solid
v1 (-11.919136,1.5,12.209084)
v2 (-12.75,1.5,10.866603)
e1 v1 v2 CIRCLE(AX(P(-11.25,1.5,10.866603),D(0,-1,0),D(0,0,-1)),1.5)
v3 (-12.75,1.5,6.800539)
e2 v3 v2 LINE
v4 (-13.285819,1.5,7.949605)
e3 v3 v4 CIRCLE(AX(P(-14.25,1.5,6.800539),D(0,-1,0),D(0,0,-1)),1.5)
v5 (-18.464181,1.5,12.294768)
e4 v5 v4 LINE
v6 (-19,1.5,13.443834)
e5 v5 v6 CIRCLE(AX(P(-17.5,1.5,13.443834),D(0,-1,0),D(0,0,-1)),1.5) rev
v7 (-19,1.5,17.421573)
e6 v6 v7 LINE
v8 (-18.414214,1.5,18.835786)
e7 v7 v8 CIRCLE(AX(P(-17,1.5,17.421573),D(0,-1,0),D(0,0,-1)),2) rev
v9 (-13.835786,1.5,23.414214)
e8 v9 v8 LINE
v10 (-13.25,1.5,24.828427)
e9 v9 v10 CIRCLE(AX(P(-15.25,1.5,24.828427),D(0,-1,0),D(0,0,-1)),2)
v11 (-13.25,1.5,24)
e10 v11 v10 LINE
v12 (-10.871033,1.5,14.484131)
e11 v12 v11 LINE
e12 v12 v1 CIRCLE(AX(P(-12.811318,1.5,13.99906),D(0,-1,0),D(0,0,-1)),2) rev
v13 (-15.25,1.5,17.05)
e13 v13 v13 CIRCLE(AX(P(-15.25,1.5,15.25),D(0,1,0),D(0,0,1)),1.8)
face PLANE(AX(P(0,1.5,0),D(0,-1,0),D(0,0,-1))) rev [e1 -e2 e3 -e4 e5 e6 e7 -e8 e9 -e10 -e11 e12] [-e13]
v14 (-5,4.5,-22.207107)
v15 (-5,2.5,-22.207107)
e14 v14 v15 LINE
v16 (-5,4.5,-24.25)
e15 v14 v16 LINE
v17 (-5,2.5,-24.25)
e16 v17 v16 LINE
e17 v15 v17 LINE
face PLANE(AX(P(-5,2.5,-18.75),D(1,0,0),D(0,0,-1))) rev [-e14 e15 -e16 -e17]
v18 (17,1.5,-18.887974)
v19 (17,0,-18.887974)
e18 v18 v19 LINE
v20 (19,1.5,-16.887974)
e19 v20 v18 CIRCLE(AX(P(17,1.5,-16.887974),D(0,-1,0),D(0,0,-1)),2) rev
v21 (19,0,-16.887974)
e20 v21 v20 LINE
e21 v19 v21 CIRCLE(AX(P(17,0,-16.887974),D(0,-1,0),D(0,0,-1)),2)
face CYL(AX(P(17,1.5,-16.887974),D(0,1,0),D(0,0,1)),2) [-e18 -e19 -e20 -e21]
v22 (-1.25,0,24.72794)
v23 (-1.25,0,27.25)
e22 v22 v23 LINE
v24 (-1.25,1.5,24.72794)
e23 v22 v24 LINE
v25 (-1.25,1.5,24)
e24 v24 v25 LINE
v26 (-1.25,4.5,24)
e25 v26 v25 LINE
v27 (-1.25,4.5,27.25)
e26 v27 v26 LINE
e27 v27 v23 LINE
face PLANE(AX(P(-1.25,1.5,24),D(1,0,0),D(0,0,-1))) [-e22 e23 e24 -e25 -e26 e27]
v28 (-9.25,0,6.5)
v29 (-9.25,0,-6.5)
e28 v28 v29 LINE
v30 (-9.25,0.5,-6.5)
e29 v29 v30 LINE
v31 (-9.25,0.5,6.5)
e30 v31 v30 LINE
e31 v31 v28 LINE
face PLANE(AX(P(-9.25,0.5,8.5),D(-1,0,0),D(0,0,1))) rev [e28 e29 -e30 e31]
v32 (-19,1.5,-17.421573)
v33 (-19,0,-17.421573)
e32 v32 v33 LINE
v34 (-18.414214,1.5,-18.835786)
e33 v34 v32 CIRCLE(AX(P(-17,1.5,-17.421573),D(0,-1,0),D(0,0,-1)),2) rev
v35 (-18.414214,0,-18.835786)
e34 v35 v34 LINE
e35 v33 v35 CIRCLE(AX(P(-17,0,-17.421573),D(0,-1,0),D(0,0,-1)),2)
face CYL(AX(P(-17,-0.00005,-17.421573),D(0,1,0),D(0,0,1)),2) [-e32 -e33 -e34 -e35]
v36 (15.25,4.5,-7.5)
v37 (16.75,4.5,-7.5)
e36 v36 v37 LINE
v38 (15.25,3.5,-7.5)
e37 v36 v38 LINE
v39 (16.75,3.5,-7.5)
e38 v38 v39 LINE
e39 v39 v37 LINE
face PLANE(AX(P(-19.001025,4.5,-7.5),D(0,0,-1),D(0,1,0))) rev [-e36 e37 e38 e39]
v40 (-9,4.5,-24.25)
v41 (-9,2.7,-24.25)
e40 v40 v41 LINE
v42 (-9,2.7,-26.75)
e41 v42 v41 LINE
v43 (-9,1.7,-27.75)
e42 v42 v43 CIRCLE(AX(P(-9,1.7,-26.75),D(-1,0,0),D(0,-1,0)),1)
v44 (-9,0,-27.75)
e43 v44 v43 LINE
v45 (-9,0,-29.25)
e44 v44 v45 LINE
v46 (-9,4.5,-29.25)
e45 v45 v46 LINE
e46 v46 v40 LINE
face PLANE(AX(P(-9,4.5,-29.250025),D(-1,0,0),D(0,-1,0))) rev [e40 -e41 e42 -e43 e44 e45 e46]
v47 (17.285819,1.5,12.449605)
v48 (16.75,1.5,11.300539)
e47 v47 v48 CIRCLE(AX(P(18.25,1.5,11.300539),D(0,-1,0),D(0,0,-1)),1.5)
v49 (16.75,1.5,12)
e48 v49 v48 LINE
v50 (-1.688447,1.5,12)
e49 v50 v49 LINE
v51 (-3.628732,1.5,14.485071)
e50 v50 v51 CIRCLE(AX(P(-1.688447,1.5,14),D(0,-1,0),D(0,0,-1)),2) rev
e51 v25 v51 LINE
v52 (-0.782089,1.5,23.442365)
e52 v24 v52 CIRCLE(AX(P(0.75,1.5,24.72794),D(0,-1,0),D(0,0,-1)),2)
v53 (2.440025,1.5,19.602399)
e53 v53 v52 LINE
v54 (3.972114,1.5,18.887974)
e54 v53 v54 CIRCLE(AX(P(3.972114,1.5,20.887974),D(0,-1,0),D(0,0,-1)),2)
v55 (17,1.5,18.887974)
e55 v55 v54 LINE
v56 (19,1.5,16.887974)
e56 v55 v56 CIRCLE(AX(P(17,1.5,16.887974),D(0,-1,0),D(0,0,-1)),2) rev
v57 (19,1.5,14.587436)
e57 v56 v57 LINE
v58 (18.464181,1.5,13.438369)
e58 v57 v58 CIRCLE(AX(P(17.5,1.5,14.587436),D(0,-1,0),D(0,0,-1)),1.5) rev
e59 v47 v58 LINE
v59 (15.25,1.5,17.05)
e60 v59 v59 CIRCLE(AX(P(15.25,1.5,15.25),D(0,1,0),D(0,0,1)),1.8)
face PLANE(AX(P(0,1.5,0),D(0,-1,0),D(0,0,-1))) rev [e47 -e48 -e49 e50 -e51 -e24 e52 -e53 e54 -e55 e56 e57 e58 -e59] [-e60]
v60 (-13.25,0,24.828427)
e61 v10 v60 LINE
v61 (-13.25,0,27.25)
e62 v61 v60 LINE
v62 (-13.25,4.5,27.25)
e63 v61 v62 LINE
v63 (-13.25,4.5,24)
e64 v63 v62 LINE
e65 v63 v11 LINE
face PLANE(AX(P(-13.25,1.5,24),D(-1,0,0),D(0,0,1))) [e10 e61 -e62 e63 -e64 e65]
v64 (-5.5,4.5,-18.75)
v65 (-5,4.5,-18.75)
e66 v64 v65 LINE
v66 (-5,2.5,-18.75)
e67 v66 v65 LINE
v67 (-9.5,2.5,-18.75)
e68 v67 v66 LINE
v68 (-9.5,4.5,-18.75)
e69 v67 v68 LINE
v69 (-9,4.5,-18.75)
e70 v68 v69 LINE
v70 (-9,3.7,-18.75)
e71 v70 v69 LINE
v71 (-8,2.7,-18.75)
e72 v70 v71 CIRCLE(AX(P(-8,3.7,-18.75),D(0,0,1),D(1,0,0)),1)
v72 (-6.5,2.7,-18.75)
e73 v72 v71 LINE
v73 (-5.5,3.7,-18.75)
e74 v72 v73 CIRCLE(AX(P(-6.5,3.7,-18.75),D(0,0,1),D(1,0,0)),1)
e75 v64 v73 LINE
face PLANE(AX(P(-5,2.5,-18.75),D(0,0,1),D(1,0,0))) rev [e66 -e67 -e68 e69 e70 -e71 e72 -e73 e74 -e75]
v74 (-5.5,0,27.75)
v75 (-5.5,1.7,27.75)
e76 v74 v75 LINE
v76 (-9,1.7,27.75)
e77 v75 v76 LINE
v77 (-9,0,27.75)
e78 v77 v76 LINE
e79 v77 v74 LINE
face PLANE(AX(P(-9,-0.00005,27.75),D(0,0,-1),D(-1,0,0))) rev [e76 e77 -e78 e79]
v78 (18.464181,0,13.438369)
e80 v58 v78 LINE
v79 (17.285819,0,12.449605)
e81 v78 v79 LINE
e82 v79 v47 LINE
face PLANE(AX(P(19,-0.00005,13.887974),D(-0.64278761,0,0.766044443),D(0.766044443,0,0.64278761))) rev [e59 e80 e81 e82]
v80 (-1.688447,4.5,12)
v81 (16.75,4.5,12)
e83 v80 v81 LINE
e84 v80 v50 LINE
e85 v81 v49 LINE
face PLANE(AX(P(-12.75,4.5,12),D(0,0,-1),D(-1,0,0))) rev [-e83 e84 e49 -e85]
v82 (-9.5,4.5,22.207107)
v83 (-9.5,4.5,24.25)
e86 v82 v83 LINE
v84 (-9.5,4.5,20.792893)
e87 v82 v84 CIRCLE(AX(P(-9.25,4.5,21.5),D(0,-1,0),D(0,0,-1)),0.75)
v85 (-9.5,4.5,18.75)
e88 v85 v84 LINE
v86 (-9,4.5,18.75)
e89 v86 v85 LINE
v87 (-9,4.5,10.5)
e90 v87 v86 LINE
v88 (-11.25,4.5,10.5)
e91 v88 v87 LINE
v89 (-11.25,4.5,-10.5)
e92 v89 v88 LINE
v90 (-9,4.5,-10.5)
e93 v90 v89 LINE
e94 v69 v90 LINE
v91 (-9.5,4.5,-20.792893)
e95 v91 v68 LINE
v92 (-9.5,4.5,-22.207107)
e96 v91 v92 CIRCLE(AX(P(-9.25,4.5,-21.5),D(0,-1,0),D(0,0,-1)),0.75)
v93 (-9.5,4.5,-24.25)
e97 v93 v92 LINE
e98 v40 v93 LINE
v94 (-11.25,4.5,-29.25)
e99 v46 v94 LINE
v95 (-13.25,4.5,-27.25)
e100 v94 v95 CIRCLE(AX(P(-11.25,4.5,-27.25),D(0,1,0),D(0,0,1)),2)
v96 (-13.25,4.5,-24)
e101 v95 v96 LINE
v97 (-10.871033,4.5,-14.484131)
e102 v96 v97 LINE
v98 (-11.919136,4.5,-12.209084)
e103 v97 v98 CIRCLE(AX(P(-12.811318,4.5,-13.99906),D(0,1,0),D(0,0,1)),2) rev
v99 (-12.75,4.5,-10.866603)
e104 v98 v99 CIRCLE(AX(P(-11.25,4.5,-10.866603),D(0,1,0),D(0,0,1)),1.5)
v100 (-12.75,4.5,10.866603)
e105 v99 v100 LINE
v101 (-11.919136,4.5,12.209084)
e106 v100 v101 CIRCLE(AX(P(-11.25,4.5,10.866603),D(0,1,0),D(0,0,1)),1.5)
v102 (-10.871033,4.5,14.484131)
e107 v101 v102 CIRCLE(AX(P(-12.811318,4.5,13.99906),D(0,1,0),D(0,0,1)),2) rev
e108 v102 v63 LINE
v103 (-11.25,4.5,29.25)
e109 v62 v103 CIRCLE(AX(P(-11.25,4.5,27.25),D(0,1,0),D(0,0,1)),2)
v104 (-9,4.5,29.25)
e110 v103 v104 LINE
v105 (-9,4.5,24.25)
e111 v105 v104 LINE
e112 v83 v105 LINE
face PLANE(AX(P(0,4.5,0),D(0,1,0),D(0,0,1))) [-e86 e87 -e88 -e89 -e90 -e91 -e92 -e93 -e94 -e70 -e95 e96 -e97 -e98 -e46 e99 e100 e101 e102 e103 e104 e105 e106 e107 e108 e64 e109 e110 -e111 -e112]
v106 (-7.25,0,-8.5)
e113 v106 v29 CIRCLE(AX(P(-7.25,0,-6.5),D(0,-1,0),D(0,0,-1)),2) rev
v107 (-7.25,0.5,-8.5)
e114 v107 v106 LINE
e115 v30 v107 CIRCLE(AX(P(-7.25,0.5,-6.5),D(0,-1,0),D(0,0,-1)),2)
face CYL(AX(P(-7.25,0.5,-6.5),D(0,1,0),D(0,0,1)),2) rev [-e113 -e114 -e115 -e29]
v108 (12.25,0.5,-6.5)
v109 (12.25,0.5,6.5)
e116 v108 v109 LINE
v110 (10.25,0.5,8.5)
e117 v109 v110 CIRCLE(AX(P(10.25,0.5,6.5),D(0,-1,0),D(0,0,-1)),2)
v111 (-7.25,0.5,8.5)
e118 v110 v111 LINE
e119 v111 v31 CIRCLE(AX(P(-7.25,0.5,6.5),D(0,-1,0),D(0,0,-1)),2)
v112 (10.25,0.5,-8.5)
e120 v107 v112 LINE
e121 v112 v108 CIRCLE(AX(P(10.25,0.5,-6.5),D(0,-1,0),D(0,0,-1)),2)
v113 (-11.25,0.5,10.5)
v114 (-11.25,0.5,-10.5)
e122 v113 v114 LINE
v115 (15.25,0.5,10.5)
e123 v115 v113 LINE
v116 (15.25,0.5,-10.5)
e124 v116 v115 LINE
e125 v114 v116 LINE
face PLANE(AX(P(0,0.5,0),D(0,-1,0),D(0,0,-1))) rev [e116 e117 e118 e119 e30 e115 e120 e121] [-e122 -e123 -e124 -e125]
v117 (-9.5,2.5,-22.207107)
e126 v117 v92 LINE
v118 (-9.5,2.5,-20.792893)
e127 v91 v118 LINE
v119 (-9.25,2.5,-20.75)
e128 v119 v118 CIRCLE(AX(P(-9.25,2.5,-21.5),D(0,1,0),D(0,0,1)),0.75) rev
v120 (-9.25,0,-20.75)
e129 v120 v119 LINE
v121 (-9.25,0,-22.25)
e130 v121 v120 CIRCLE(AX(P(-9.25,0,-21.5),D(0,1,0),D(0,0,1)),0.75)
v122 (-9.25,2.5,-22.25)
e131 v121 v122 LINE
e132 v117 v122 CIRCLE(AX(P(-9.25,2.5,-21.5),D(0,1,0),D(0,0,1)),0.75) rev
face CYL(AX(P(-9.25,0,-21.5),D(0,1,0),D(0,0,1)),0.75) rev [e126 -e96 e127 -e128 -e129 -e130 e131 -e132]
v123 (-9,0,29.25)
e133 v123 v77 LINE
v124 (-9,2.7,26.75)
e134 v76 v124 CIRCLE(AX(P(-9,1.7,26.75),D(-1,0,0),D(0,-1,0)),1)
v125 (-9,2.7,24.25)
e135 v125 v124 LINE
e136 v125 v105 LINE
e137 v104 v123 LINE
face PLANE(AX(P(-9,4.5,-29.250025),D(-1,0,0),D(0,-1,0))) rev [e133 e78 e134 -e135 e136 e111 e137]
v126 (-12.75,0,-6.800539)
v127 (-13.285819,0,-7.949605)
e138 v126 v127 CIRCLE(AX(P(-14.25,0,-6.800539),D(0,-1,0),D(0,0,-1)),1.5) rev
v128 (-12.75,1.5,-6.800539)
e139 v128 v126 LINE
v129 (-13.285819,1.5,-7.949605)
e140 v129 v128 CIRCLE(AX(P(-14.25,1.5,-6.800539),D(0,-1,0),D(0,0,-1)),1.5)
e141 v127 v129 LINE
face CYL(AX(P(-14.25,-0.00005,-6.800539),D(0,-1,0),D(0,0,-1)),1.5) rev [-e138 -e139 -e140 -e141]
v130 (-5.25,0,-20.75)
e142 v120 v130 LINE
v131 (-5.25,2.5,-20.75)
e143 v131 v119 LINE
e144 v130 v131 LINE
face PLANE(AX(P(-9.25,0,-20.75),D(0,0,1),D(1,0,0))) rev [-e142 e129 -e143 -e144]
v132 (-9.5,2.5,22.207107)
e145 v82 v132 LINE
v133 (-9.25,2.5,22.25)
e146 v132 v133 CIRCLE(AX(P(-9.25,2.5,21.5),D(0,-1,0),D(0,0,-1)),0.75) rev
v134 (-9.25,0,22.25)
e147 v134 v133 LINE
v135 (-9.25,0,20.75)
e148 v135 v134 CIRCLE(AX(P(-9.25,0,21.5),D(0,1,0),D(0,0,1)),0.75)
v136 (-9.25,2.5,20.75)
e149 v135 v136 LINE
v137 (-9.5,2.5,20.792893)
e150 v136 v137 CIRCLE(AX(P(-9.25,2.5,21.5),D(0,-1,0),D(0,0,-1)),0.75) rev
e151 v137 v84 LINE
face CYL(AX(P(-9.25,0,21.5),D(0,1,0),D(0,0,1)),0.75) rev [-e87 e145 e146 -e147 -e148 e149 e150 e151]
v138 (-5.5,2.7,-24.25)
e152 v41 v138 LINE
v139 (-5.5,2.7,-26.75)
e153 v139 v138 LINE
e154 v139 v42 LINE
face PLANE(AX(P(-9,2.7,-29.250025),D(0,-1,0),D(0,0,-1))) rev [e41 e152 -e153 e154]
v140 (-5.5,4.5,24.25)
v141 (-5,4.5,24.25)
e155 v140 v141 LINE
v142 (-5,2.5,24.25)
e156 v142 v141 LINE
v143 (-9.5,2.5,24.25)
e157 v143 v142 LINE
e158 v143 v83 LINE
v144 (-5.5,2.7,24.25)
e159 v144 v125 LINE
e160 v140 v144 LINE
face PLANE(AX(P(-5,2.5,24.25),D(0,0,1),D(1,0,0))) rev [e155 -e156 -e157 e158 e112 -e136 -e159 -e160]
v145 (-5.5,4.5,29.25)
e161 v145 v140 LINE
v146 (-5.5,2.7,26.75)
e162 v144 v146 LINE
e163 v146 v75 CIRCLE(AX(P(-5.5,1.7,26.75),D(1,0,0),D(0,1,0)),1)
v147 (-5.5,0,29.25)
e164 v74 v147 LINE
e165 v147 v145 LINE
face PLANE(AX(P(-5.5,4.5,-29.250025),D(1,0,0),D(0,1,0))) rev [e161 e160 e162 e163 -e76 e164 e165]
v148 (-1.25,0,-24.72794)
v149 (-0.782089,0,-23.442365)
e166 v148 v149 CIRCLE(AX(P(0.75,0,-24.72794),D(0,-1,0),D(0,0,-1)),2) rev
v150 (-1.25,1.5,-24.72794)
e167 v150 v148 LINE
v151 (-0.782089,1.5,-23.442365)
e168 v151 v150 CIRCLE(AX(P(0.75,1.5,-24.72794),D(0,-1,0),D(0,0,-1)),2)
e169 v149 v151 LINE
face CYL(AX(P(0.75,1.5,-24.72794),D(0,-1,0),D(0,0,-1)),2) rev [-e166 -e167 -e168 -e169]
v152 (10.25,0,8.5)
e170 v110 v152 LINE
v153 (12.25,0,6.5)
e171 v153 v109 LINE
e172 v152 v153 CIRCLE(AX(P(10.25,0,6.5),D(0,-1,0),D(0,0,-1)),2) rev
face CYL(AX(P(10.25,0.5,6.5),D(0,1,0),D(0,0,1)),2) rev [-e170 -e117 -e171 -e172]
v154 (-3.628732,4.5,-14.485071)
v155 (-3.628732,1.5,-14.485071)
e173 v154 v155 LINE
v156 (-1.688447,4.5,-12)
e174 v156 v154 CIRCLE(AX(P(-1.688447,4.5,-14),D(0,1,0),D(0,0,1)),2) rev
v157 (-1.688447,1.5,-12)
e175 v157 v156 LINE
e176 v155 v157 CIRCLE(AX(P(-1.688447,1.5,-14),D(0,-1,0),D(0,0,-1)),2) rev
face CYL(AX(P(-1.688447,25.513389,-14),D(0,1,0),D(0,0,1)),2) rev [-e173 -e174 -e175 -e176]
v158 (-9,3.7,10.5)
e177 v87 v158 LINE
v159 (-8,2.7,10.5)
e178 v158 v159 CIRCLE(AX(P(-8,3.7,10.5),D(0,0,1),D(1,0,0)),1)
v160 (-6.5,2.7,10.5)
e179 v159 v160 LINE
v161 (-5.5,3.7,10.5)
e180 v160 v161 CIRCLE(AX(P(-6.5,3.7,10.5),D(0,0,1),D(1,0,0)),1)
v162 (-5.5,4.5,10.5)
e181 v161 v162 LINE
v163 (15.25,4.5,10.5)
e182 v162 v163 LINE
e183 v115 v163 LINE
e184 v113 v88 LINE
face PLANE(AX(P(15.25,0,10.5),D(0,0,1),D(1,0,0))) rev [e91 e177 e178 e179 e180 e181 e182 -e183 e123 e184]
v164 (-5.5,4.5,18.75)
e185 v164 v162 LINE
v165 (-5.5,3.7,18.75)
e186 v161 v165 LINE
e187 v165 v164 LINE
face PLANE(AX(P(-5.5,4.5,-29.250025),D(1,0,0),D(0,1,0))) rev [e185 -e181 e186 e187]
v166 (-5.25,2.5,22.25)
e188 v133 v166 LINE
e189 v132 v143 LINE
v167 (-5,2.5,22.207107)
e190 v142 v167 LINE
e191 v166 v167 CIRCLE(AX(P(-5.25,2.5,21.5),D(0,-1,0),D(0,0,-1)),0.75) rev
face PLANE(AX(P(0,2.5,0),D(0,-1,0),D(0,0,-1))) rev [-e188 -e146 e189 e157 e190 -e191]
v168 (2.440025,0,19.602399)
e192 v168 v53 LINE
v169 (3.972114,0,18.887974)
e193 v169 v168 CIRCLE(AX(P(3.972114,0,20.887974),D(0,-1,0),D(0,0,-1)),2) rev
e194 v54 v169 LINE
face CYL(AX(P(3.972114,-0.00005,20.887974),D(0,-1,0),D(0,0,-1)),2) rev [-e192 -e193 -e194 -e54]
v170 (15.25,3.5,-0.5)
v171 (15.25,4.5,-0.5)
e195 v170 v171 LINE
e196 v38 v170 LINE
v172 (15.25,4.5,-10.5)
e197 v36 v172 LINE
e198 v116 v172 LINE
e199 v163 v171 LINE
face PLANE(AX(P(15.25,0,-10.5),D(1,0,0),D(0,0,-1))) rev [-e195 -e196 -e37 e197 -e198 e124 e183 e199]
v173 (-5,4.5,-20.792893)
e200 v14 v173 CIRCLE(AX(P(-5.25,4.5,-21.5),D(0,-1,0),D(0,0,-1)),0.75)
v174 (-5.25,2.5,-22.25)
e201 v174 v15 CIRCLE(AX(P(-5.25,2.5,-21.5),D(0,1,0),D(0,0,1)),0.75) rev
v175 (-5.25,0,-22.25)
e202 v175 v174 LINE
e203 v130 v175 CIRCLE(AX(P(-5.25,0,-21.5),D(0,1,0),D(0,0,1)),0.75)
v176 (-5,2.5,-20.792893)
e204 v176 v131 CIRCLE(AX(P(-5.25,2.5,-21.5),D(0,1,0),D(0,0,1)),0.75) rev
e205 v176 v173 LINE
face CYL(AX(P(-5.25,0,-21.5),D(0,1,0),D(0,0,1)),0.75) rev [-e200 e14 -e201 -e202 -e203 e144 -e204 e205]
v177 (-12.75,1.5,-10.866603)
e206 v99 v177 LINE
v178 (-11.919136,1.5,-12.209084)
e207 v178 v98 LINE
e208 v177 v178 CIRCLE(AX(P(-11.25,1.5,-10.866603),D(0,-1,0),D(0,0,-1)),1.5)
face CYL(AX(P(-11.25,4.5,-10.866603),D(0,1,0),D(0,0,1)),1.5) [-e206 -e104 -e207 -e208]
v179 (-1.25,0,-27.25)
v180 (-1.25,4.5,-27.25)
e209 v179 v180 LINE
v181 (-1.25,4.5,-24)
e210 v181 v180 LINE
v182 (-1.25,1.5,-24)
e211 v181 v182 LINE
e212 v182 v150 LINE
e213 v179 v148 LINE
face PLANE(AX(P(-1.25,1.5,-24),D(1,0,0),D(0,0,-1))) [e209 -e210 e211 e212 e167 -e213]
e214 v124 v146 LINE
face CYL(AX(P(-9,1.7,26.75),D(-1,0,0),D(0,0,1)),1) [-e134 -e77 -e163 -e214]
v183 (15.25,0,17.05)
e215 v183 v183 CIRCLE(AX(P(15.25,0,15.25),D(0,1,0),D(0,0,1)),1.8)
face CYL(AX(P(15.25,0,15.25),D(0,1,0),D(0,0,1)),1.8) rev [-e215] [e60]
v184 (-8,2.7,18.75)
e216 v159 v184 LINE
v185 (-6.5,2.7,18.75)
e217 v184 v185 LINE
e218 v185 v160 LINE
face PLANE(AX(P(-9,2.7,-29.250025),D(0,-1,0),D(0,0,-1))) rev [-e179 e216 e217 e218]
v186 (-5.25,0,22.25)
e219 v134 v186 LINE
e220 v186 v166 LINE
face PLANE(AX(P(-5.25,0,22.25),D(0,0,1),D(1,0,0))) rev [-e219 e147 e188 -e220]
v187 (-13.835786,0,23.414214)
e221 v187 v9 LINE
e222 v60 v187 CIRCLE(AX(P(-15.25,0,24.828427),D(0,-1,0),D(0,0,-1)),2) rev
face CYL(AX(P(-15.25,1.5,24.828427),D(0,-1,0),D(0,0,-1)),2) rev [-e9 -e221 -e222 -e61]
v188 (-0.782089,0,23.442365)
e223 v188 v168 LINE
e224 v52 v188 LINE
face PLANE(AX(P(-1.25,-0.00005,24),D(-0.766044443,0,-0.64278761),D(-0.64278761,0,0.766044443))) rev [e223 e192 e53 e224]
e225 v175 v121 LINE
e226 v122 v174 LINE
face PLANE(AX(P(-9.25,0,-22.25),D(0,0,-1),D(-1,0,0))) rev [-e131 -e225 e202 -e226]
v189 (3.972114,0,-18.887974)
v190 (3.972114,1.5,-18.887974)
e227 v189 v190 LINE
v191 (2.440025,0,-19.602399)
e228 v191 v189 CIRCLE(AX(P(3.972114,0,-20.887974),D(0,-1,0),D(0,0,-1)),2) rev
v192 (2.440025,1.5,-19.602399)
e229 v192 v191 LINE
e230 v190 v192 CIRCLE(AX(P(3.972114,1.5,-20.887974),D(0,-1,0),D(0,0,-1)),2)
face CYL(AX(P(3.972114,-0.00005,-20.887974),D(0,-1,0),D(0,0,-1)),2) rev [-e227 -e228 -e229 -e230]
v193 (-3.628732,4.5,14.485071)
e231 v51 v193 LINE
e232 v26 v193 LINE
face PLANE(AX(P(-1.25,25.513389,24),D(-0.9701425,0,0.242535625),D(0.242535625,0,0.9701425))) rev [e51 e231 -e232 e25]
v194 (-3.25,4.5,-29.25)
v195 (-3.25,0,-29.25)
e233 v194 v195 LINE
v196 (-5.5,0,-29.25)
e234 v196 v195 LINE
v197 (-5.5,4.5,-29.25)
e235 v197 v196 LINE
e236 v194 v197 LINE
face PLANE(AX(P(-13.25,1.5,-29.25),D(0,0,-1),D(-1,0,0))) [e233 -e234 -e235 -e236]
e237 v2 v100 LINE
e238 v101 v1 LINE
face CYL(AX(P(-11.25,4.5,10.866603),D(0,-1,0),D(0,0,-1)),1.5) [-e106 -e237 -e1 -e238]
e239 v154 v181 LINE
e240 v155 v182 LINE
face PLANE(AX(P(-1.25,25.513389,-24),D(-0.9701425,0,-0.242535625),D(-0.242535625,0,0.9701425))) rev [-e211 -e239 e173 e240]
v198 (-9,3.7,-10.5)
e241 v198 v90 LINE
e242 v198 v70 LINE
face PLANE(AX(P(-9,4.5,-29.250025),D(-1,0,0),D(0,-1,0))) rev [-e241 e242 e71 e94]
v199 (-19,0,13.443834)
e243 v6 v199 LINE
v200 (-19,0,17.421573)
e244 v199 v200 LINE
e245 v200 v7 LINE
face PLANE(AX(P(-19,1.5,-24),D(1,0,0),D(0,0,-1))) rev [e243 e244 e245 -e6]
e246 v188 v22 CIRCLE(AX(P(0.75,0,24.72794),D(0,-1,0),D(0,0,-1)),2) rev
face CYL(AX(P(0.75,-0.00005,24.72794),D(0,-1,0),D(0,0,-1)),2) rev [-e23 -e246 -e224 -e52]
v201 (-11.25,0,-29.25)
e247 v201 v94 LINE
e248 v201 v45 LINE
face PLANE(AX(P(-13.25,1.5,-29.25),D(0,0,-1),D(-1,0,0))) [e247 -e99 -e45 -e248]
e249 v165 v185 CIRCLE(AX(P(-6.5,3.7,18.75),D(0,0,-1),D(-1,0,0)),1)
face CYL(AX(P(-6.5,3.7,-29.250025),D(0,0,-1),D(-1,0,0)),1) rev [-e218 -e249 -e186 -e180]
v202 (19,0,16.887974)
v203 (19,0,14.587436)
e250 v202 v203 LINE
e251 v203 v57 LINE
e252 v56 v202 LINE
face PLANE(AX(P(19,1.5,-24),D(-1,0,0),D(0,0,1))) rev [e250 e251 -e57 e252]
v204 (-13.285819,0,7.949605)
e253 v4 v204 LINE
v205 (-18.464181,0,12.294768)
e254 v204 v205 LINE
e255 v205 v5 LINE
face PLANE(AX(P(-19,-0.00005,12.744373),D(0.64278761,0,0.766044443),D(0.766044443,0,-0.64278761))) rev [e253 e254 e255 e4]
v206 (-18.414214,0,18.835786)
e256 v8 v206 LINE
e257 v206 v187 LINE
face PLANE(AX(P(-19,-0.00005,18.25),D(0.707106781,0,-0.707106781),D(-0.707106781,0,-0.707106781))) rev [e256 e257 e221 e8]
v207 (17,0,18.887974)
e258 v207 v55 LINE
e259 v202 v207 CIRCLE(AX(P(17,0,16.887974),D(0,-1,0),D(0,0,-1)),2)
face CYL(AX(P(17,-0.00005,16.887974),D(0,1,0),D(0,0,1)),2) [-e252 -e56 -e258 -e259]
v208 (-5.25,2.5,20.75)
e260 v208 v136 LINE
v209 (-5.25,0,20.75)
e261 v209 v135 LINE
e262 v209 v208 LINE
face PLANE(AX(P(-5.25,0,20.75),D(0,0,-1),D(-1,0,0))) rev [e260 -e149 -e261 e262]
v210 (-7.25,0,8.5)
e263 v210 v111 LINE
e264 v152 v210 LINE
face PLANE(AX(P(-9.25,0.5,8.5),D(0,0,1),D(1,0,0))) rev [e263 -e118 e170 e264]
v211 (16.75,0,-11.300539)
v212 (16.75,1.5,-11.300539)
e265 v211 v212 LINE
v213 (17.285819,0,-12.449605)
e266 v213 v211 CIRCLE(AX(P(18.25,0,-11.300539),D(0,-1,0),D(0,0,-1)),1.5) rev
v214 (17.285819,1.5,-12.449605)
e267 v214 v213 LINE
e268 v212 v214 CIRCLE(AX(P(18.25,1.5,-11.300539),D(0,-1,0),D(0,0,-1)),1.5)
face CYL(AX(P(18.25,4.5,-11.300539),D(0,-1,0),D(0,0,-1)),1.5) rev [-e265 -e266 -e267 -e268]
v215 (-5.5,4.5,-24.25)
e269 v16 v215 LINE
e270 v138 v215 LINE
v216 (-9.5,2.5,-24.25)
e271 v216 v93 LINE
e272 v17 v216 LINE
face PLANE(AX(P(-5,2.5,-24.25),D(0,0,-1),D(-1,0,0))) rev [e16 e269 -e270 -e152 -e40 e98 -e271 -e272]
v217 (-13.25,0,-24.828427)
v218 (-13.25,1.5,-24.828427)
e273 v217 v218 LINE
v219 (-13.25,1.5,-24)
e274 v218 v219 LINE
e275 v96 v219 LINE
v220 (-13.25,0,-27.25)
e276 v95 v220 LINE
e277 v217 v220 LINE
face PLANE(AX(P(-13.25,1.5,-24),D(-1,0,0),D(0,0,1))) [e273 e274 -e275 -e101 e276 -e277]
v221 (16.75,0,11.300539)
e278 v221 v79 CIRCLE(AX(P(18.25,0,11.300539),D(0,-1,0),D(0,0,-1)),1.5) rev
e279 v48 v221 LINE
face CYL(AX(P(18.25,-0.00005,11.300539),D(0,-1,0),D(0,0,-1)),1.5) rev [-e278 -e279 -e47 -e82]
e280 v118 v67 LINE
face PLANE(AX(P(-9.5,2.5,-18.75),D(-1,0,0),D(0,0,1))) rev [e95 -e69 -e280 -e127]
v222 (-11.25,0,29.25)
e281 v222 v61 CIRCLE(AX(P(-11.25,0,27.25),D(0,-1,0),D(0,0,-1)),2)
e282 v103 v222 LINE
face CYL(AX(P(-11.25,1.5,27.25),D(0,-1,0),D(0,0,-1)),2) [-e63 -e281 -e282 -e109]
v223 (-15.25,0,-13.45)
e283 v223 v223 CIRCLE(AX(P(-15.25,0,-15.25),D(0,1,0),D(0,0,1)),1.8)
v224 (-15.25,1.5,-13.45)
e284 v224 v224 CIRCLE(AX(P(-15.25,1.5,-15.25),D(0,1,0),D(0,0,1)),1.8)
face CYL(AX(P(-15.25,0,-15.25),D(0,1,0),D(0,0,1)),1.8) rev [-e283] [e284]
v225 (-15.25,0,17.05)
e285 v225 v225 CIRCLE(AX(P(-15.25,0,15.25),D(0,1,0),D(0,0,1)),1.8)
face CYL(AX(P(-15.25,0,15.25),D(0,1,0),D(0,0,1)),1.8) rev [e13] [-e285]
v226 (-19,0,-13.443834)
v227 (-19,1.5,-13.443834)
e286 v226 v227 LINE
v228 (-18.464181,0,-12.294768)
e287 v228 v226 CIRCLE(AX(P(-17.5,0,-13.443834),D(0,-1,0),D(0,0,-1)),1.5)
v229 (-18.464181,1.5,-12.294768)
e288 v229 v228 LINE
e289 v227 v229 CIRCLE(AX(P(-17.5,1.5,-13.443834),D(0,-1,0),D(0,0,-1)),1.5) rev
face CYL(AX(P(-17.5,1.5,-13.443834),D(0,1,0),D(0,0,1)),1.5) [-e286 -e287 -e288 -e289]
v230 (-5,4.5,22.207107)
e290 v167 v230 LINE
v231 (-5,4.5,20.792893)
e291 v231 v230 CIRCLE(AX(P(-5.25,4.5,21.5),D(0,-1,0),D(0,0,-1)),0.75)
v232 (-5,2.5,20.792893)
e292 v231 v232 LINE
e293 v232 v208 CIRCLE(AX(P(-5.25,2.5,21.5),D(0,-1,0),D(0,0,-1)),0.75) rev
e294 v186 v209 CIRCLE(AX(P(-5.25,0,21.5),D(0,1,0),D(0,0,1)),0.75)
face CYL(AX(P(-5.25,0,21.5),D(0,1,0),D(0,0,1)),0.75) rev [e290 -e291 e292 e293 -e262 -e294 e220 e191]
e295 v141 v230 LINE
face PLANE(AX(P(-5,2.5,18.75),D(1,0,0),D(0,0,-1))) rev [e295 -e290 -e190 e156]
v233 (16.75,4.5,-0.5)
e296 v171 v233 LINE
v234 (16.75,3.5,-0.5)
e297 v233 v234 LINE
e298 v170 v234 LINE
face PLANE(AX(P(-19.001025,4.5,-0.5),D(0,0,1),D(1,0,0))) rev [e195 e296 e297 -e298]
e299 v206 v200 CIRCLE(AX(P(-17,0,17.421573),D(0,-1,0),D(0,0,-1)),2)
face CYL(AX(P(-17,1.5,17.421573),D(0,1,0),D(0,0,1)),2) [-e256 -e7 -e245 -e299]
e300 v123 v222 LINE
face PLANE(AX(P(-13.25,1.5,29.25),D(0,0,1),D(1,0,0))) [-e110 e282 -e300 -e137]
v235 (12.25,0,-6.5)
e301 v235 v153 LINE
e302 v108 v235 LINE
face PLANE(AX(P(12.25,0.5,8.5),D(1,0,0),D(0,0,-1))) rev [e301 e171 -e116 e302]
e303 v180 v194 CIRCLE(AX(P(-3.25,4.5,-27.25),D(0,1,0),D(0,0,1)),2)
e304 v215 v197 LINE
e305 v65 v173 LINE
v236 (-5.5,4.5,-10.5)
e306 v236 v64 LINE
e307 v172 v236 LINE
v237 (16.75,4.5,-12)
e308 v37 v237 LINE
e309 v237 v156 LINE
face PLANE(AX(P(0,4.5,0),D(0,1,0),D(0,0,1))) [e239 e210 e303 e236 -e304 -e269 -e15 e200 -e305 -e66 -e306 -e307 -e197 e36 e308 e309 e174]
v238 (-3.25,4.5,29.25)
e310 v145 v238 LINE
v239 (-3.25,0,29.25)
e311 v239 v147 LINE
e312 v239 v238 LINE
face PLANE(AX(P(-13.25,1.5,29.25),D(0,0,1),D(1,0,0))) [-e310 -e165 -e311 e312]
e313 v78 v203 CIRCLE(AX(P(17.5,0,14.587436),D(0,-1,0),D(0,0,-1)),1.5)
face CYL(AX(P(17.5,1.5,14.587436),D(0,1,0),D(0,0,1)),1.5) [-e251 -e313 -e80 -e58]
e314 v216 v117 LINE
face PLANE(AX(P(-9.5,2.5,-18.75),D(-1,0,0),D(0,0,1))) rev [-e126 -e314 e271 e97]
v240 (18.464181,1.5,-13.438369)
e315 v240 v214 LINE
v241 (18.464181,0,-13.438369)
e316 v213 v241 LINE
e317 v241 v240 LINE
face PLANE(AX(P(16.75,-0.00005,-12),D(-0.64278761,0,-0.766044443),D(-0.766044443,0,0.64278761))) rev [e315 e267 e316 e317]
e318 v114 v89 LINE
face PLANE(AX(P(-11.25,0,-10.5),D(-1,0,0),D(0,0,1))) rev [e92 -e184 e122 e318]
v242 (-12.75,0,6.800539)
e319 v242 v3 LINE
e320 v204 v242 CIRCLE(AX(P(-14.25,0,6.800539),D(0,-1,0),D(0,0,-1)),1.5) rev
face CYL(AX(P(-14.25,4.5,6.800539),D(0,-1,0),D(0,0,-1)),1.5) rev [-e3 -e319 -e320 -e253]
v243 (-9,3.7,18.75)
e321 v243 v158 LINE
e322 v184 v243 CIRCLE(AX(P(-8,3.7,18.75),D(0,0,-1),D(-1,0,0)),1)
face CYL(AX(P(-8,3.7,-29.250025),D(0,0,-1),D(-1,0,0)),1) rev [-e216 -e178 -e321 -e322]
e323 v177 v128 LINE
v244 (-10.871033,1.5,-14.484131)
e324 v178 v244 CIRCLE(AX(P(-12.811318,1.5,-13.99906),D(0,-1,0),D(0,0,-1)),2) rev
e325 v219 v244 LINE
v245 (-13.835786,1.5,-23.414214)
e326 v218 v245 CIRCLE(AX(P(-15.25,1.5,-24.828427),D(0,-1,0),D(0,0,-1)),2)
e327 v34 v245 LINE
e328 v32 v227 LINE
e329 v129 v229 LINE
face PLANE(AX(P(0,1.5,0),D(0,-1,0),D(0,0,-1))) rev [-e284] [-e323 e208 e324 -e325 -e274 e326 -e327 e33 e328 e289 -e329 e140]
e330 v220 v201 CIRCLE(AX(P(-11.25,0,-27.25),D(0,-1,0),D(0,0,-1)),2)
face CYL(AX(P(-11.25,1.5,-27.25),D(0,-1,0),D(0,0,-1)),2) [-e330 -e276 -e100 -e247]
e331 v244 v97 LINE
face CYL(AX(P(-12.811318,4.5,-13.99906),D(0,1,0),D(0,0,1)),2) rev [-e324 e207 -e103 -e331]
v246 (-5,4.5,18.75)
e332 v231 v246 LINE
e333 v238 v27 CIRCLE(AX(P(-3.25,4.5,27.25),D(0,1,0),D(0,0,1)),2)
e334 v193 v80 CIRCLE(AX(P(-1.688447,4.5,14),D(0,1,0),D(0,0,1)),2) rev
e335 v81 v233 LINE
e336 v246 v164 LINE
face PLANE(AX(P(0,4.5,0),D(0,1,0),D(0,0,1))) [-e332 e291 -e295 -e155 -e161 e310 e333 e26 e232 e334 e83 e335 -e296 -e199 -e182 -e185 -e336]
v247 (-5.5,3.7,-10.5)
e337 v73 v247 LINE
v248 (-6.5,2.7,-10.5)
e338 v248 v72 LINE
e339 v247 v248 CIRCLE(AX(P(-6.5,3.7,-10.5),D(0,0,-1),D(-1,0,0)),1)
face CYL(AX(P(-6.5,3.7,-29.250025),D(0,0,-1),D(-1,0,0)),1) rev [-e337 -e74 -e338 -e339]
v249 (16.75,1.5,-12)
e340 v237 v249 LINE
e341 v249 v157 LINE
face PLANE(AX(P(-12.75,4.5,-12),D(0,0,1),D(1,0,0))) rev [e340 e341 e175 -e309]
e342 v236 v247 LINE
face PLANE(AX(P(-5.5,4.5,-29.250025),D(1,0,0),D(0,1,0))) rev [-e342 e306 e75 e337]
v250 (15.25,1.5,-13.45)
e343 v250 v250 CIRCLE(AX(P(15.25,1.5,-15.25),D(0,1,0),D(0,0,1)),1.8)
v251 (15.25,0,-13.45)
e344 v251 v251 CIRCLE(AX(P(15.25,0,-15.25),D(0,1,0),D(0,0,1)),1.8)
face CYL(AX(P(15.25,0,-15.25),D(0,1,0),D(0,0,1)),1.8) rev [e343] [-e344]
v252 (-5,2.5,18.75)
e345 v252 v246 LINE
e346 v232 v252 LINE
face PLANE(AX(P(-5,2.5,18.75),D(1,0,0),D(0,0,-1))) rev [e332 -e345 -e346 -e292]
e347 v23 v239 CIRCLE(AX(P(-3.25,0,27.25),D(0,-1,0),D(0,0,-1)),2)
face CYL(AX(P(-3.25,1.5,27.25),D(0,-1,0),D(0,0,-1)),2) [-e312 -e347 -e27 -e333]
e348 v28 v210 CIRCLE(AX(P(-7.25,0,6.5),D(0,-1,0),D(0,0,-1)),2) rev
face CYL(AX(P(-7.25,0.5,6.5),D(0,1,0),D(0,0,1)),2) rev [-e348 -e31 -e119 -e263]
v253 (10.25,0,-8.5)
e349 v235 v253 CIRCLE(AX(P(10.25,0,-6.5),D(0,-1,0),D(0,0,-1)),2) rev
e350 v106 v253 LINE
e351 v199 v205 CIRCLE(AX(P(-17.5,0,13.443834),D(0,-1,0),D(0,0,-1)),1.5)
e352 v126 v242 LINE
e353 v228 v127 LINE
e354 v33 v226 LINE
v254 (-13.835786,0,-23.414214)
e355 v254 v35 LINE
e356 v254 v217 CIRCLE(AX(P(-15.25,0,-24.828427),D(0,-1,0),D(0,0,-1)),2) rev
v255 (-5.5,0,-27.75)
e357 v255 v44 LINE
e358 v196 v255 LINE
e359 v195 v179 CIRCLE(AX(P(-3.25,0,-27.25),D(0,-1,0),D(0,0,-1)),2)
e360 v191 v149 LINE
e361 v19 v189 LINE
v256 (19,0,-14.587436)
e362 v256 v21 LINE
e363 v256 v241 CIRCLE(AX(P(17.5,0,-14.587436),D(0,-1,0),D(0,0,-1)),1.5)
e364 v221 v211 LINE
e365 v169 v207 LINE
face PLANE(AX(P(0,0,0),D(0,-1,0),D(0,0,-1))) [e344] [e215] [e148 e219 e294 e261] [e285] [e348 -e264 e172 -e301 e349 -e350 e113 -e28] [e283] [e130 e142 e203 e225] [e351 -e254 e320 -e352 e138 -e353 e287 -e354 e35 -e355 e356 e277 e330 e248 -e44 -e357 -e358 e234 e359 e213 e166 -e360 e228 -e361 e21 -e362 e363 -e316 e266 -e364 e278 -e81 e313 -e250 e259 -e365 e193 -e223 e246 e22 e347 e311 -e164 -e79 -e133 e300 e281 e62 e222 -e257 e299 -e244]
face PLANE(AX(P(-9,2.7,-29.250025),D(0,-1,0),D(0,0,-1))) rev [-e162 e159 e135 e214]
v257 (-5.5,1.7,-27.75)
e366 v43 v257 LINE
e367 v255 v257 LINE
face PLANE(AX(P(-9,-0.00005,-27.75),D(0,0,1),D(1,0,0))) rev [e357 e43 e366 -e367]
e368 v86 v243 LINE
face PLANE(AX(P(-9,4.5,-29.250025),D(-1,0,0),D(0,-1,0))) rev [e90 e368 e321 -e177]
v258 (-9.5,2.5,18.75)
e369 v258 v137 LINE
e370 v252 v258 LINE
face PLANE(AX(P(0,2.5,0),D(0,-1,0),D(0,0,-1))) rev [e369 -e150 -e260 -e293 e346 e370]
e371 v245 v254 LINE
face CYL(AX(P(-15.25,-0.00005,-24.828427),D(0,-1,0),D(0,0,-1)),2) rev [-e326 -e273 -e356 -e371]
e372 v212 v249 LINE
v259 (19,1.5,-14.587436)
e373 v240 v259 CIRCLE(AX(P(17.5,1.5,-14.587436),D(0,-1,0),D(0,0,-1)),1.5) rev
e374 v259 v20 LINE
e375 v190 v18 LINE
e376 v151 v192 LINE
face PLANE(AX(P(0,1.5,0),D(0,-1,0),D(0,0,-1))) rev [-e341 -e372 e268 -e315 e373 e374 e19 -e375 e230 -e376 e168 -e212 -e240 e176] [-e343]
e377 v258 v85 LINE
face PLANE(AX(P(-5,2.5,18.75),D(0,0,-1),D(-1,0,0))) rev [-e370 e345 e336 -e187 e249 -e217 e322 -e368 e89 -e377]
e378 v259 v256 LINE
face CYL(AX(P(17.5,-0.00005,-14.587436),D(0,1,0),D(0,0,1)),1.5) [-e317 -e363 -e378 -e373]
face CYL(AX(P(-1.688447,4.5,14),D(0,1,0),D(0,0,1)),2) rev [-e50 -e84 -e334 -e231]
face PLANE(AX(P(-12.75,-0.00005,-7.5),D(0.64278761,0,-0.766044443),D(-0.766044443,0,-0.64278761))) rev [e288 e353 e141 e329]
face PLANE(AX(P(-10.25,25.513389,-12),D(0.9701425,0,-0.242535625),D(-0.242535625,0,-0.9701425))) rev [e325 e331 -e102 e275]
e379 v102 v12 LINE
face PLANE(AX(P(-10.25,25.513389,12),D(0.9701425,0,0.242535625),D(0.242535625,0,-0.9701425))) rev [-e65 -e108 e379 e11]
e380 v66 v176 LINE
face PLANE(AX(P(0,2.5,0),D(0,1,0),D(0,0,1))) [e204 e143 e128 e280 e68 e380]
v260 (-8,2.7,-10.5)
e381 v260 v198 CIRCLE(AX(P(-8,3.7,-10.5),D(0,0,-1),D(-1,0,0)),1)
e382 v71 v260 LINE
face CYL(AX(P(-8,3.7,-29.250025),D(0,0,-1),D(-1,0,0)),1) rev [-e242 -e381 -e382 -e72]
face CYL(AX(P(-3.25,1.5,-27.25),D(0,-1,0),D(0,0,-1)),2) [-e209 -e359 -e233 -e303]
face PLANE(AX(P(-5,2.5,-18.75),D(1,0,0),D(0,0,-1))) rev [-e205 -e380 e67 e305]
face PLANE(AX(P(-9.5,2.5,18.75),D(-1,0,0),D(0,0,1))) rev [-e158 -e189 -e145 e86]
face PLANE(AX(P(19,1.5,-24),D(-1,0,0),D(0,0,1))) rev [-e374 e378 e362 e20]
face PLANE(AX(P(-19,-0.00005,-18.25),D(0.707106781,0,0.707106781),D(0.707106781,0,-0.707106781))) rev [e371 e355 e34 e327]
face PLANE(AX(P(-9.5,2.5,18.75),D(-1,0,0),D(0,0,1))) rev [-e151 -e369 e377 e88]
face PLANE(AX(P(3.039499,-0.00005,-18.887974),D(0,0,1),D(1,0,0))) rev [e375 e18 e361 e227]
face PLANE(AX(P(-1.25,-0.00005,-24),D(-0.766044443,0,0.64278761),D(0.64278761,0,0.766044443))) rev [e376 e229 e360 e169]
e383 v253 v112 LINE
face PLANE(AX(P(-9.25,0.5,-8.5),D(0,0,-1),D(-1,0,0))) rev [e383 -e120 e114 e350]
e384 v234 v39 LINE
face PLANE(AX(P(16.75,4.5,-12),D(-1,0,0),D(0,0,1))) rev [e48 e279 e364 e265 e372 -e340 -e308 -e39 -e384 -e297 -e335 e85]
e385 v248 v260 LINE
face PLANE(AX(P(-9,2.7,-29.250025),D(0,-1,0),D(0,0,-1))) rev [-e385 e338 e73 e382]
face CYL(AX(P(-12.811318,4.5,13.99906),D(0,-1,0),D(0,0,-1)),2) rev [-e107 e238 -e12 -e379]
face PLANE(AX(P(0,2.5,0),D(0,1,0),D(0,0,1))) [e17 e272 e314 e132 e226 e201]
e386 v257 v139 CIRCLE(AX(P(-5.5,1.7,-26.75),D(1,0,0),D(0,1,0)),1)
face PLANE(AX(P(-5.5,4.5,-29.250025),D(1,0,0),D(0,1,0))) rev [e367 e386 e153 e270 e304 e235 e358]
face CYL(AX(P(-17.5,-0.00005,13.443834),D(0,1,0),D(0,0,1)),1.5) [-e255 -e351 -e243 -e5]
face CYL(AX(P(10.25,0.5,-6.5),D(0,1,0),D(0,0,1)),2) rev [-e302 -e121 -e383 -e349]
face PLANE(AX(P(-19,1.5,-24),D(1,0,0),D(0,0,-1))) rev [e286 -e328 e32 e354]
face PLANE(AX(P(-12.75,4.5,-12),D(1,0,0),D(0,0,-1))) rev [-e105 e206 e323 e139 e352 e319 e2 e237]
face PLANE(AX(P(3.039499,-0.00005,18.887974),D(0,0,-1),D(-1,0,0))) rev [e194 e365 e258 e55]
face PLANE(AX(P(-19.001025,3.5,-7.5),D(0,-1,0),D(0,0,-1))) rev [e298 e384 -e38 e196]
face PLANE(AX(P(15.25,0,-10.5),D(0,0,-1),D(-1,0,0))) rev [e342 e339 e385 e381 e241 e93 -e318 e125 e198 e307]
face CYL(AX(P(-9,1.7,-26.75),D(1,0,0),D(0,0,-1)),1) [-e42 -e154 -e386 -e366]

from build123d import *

# Parameters (mm, degrees)
SKIZZE1_W                                     = 38
SKIZZE1_H                                     = 48
GRUNDPLATTE_DEPTH                             = 1.5
SKIZZE2_R                                     = 1.8
FC_BOHRUNGEN_DEPTH                            = 1.5
SKIZZE3_W                                     = 26.5
SKIZZE3_H                                     = 21
AUSCHNITT_EMPF_NGER_DEPTH                     = 31.647185841
SKIZZE4_W                                     = 26.5
SKIZZE4_H                                     = 21
SKIZZE4_W_2                                   = 21.5
SKIZZE4_H_2                                   = 17
AUFLAGEEMPF_NGER_DEPTH                        = 0.5
VERRUNDUNG1_R                                 = 2
LANGLOCHKABELBINDER_DEPTH                     = 31.647185841
SKIZZE8_W                                     = 12
SKIZZE8_H                                     = 5.25
AUFSATZ_LINEAR_AUSTRAGEN7_DEPTH               = 1.5
SKIZZE10_W                                    = 29.5
SKIZZE10_H                                    = 24
SKIZZE10_W_2                                  = 26.5
SKIZZE10_H_2                                  = 21
HALTERAHMEN_EMPF_NGER_DEPTH                   = 3
DURCHBRUCH_EMPF_NGER_REACH                    = 48.41
SKIZZE11_W                                    = 7
SKIZZE11_H                                    = 1
VERST_RKUNG_KABELBINDER_DEPTH                 = 3
VERRUNDUNG_VERST_RKUNG_KABELBINDER_R          = 2
AUSSCHNITT_ANTENNENANSATZEMPF_NGER_DEPTH      = 45.286707938
AUSSCHNITT_ANTENNENANSATZEMPF_NGER_DEPTH_BACK = 45.286707938
SKIZZE13_W                                    = 3.5
SKIZZE13_H                                    = 1.8
LANGLOCH_REPARATUR_DEPTH                      = 36.168345142
SKIZZE15_W                                    = 3.5
SKIZZE15_H                                    = 1.5
SCHNITT_LINEAR_AUSTRAGEN8_DEPTH               = 35.983603302
SKIZZE16_W                                    = 4.5
SKIZZE16_H                                    = 5.5
SCHNITT_LINEAR_AUSTRAGEN9_DEPTH               = 2
SCHNITT_LINEAR_AUSTRAGEN10_DEPTH              = 36.008034792
VERRUNDUNG6_R                                 = 1
VERRUNDUNG7_R                                 = 1.5
VERRUNDUNG8_R                                 = 1
VERRUNDUNG4_R                                 = 2
VERRUNDUNG5_R                                 = 1.5


with BuildPart() as part:
    # Skizze1 → Grundplatte (new body)
    with BuildSketch(Plane(origin=(0, 0, 0), x_dir=(1, 0, 0), z_dir=(0, 1, 0))):
        Rectangle(SKIZZE1_W, SKIZZE1_H)
    extrude(amount=GRUNDPLATTE_DEPTH)

    # Skizze2 → FC-Bohrungen (cut)
    with BuildSketch(Plane(origin=(0, 1.5, 0), x_dir=(1, 0, 0), z_dir=(0, 1, 0))):
        with Locations(Location((-15.25, 15.25, 0), (0, 0, 270))):
            Circle(SKIZZE2_R)
        with Locations(Location((15.25, 15.25, 0), (0, 0, 270))):
            Circle(SKIZZE2_R)
        with Locations(Location((15.25, -15.25, 0), (0, 0, 270))):
            Circle(SKIZZE2_R)
        with Locations(Location((-15.25, -15.25, 0), (0, 0, 270))):
            Circle(SKIZZE2_R)
    extrude(amount=-FC_BOHRUNGEN_DEPTH, mode=Mode.SUBTRACT)

    # Skizze3 → Auschnitt Empfänger (cut, through all)
    with BuildSketch(Plane(origin=(0, 1.5, 0), x_dir=(1, 0, 0), z_dir=(0, 1, 0))):
        with Locations((2, 0)):
            Rectangle(SKIZZE3_W, SKIZZE3_H)
    extrude(amount=-AUSCHNITT_EMPF_NGER_DEPTH, mode=Mode.SUBTRACT)

    # Skizze4 → AuflageEMpfänger (add)
    with BuildSketch(Plane.XZ):
        with Locations((2, 0)):
            Rectangle(SKIZZE4_W, SKIZZE4_H)
        with Locations((1.5, 0)):
            Rectangle(SKIZZE4_W_2, SKIZZE4_H_2, mode=Mode.SUBTRACT)
    extrude(amount=-AUFLAGEEMPF_NGER_DEPTH)

    # Verrundung1
    verrundung1_edges = [part.edges().sort_by_distance(p)[0] for p in [
        (-9.25, 0.25, 8.5),
        (12.25, 0.25, 8.5),
        (12.25, 0.25, -8.5),
        (-9.25, 0.25, -8.5),
    ]]
    fillet(verrundung1_edges, radius=VERRUNDUNG1_R)

    # Skizze7 → LanglochKabelbinder (cut, through all)
    with BuildSketch(Plane(origin=(0, 1.5, 0), x_dir=(1, 0, 0), z_dir=(0, 1, 0))):
        with BuildLine():
            Line((-9.25, 22.25), (-5.25, 22.25))
            ThreePointArc((-5.25, 22.25), (-4.5, 21.5), (-5.25, 20.75))
            Line((-5.25, 20.75), (-9.25, 20.75))
            ThreePointArc((-9.25, 20.75), (-10, 21.5), (-9.25, 22.25))
        make_face()
        with BuildLine():
            Line((-5.25, -22.25), (-9.25, -22.25))
            ThreePointArc((-9.25, -22.25), (-10, -21.5), (-9.25, -20.75))
            Line((-9.25, -20.75), (-5.25, -20.75))
            ThreePointArc((-5.25, -20.75), (-4.5, -21.5), (-5.25, -22.25))
        make_face()
    extrude(amount=-LANGLOCHKABELBINDER_DEPTH, mode=Mode.SUBTRACT)

    # Skizze8 → Aufsatz-Linear austragen7 (add, through all)
    with BuildSketch(Plane.XZ):
        with Locations((-7.25, 26.625)):
            Rectangle(SKIZZE8_W, SKIZZE8_H)
        with Locations((-7.25, -26.625)):
            Rectangle(SKIZZE8_W, SKIZZE8_H)
    extrude(amount=-AUFSATZ_LINEAR_AUSTRAGEN7_DEPTH)

    # Skizze10 → Halterahmen Empfänger (add)
    with BuildSketch(Plane(origin=(0, 1.5, 0), x_dir=(1, 0, 0), z_dir=(0, 1, 0))):
        with Locations((2, 0)):
            Rectangle(SKIZZE10_W, SKIZZE10_H)
        with Locations((2, 0)):
            Rectangle(SKIZZE10_W_2, SKIZZE10_H_2, mode=Mode.SUBTRACT)
    extrude(amount=HALTERAHMEN_EMPF_NGER_DEPTH)

    # Skizze11 → Durchbruch Empfänger (cut, up to next)
    with BuildSketch(Plane(origin=(16.75, 0, 0), x_dir=(0, 0, -1), z_dir=(1, 0, 0)), mode=Mode.PRIVATE) as durchbruch_empf_nger_sk1:
        with Locations((4, 4)):
            Rectangle(SKIZZE11_W, SKIZZE11_H)
    durchbruch_empf_nger_tool1 = extrude(durchbruch_empf_nger_sk1.sketch, amount=-DURCHBRUCH_EMPF_NGER_REACH, mode=Mode.PRIVATE) & part.part
    add(durchbruch_empf_nger_tool1.solids().sort_by_distance((16.75, 4, -4))[0], mode=Mode.SUBTRACT)

    # Skizze12 → Verstärkung Kabelbinder (add)
    with BuildSketch(Plane(origin=(0, 1.5, 0), x_dir=(1, 0, 0), z_dir=(0, 1, 0))):
        Polygon((-13.25, -24), (-13.25, -29.25), (-1.25, -29.25), (-1.25, -24), (-4.25, -12), (-10.25, -12), align=None)
        Polygon((-10.25, 12), (-13.25, 24), (-13.25, 29.25), (-1.25, 29.25), (-1.25, 24), (-4.25, 12), align=None)
    extrude(amount=VERST_RKUNG_KABELBINDER_DEPTH)

    # Verrundung Verstärkung Kabelbinder
    # the kernel refuses this fillet: 2 mm, written as the material it adds along each edge
    with BuildSketch(Plane(origin=(-4.25, 1.5, -12), x_dir=(0.2425356250363328, 0, -0.9701425001453319), z_dir=(0, 1, 0)), Plane(origin=(-4.25, 1.5, 12), x_dir=(1, 0, 0), z_dir=(0, 1, 0))) as verrundung_verst_rkung_kabelbinder_piece_1:
        with BuildLine():
            CenterArc((VERRUNDUNG_VERST_RKUNG_KABELBINDER_R * 1.2807764064, -VERRUNDUNG_VERST_RKUNG_KABELBINDER_R), VERRUNDUNG_VERST_RKUNG_KABELBINDER_R, 90, 104.036243468)
            Line((VERRUNDUNG_VERST_RKUNG_KABELBINDER_R * 0.310633906259, -VERRUNDUNG_VERST_RKUNG_KABELBINDER_R * 1.24253562504), (0, 0))
            Line((0, 0), (VERRUNDUNG_VERST_RKUNG_KABELBINDER_R * 1.2807764064, 0))
        make_face()
    extrude(amount=3)
    with BuildSketch(Plane(origin=(-10.25, 1.5, -12), x_dir=(-1, 0, 0), z_dir=(0, 1, 0))) as verrundung_verst_rkung_kabelbinder_piece_2_section:
        with BuildLine():
            CenterArc((VERRUNDUNG_VERST_RKUNG_KABELBINDER_R * 1.2807764064, -VERRUNDUNG_VERST_RKUNG_KABELBINDER_R), VERRUNDUNG_VERST_RKUNG_KABELBINDER_R, 90, 104.036243468)
            Line((VERRUNDUNG_VERST_RKUNG_KABELBINDER_R * 0.310633906259, -VERRUNDUNG_VERST_RKUNG_KABELBINDER_R * 1.24253562504), (0, 0))
            Line((0, 0), (VERRUNDUNG_VERST_RKUNG_KABELBINDER_R * 1.2807764064, 0))
        make_face()
    verrundung_verst_rkung_kabelbinder_piece_2 = extrude(amount=3, mode=Mode.PRIVATE)
    verrundung_verst_rkung_kabelbinder_piece_2 = split(verrundung_verst_rkung_kabelbinder_piece_2, bisect_by=Plane(origin=(-12.75, 3, -12.581943017), z_dir=(1, 0, 0)), keep=Keep.TOP, mode=Mode.PRIVATE)
    add(verrundung_verst_rkung_kabelbinder_piece_2)
    with BuildSketch(Plane(origin=(-10.25, 1.5, 12), x_dir=(-1, 0, 0), z_dir=(0, 1, 0))) as verrundung_verst_rkung_kabelbinder_piece_3_section:
        with BuildLine():
            CenterArc((VERRUNDUNG_VERST_RKUNG_KABELBINDER_R * 1.2807764064, VERRUNDUNG_VERST_RKUNG_KABELBINDER_R), VERRUNDUNG_VERST_RKUNG_KABELBINDER_R, 165.963756532, 104.036243468)
            Line((VERRUNDUNG_VERST_RKUNG_KABELBINDER_R * 0.310633906259, VERRUNDUNG_VERST_RKUNG_KABELBINDER_R * 1.24253562504), (0, 0))
            Line((0, 0), (VERRUNDUNG_VERST_RKUNG_KABELBINDER_R * 1.2807764064, 0))
        make_face()
    verrundung_verst_rkung_kabelbinder_piece_3 = extrude(amount=3, mode=Mode.PRIVATE)
    verrundung_verst_rkung_kabelbinder_piece_3 = split(verrundung_verst_rkung_kabelbinder_piece_3, bisect_by=Plane(origin=(-12.75, 3, 12.581943017), z_dir=(1, 0, 0)), keep=Keep.TOP, mode=Mode.PRIVATE)
    add(verrundung_verst_rkung_kabelbinder_piece_3)

    # Skizze13 → Ausschnitt AntennenAnsatzEmpfänger (cut, two sides: drawn at the far end of the back side and taken through both)
    with BuildSketch(Plane.XY.offset(-10.5).offset(-AUSSCHNITT_ANTENNENANSATZEMPF_NGER_DEPTH_BACK)):
        with Locations((-7.25, 3.6)):
            Rectangle(SKIZZE13_W, SKIZZE13_H)
    extrude(amount=AUSSCHNITT_ANTENNENANSATZEMPF_NGER_DEPTH + AUSSCHNITT_ANTENNENANSATZEMPF_NGER_DEPTH_BACK, mode=Mode.SUBTRACT)

    # Skizze14 → Langloch Reparatur (cut, through all)
    with BuildSketch(Plane.XZ):
        with BuildLine():
            Line((-5.25, 20.75), (-9.25, 20.75))
            ThreePointArc((-9.25, 20.75), (-10, 21.5), (-9.25, 22.25))
            Line((-9.25, 22.25), (-5.25, 22.25))
            ThreePointArc((-5.25, 22.25), (-4.5, 21.5), (-5.25, 20.75))
        make_face()
        with BuildLine():
            Line((-5.25, -22.25), (-9.25, -22.25))
            ThreePointArc((-9.25, -22.25), (-10, -21.5), (-9.25, -20.75))
            Line((-9.25, -20.75), (-5.25, -20.75))
            ThreePointArc((-5.25, -20.75), (-4.5, -21.5), (-5.25, -22.25))
        make_face()
    extrude(amount=-LANGLOCH_REPARATUR_DEPTH, mode=Mode.SUBTRACT)

    # Skizze15 → Schnitt-Linear austragen8 (cut, through all)
    with BuildSketch(Plane(origin=(0, 2.7, 0), x_dir=(1, 0, 0), z_dir=(0, 1, 0))):
        with Locations((-7.25, 28.5)):
            Rectangle(SKIZZE15_W, SKIZZE15_H)
        with Locations((-7.25, -28.5)):
            Rectangle(SKIZZE15_W, SKIZZE15_H)
    extrude(amount=-SCHNITT_LINEAR_AUSTRAGEN8_DEPTH, mode=Mode.SUBTRACT)

    # Skizze16 → Schnitt-Linear austragen9 (cut)
    with BuildSketch(Plane(origin=(0, 4.5, 0), x_dir=(1, 0, 0), z_dir=(0, 1, 0))):
        with Locations((-7.25, 21.5)):
            Rectangle(SKIZZE16_W, SKIZZE16_H)
        with Locations((-7.25, -21.5)):
            Rectangle(SKIZZE16_W, SKIZZE16_H)
    extrude(amount=-SCHNITT_LINEAR_AUSTRAGEN9_DEPTH, mode=Mode.SUBTRACT)

    # Skizze17 → Schnitt-Linear austragen10 (cut, through all)
    with BuildSketch(Plane(origin=(0, 1.5, 0), x_dir=(1, 0, 0), z_dir=(0, 1, 0))):
        Polygon((16.75, 12), (19, 13.88797417), (19, -13.88797417), (16.75, -12), align=None)
        Polygon((-12.75, 7.5), (-19, 12.744372695), (-19, -12.744372695), (-12.75, -7.5), align=None)
        Polygon((-19, 18.25), (-13.25, 24), (-19, 24), align=None)
        Polygon((-1.25, 24), (3.039498988, 18.88797417), (19, 18.88797417), (19, 24), align=None)
        Polygon((-19, -24), (-19, -18.25), (-13.25, -24), align=None)
        Polygon((19, -24), (-1.25, -24), (3.039498988, -18.88797417), (19, -18.88797417), align=None)
    extrude(amount=-SCHNITT_LINEAR_AUSTRAGEN10_DEPTH, mode=Mode.SUBTRACT)

    # Verrundung6
    verrundung6_edges = [part.edges().sort_by_distance(p)[0] for p in [
        (-7.25, 2.7, -27.75),
        (-7.25, 2.7, 27.75),
    ]]
    fillet(verrundung6_edges, radius=VERRUNDUNG6_R)

    # Verrundung7
    verrundung7_edges = [part.edges().sort_by_distance(p)[0] for p in [
        (16.75, 0.75, 12),
        (16.75, 0.75, -12),
        (19, 0.75, -13.88797417),
        (19, 0.75, 13.88797417),
        (-12.75, 0.75, -7.5),
        (-12.75, 0.75, 7.5),
        (-19, 0.75, 12.744372695),
        (-19, 0.75, -12.744372695),
    ]]
    fillet(verrundung7_edges, radius=VERRUNDUNG7_R)

    # Verrundung8
    verrundung8_edges = [part.edges().sort_by_distance(p)[0] for p in [
        (-5.5, 2.7, 14.625),
        (-9, 2.7, 14.625),
        (-5.5, 2.7, -14.625),
        (-9, 2.7, -14.625),
    ]]
    fillet(verrundung8_edges, radius=VERRUNDUNG8_R)

    # Verrundung4
    verrundung4_edges = [part.edges().sort_by_distance(p)[0] for p in [
        (-13.25, 2.25, 29.25),
        (-1.25, 2.25, 29.25),
        (-1.25, 2.25, -29.25),
        (-13.25, 2.25, -29.25),
        (-13.25, 0.75, -24),
        (-19, 0.75, -18.25),
        (-1.25, 0.75, -24),
        (3.039498988, 0.75, -18.88797417),
        (19, 0.75, -18.88797417),
        (19, 0.75, 18.88797417),
        (3.039498988, 0.75, 18.88797417),
        (-1.25, 0.75, 24),
        (-19, 0.75, 18.25),
        (-13.25, 0.75, 24),
    ]]
    fillet(verrundung4_edges, radius=VERRUNDUNG4_R)

    # Verrundung5
    verrundung5_edges = [part.edges().sort_by_distance(p)[0] for p in [
        (-12.75, 3, -12.000947412),
        (-12.75, 3, 12.000947412),
    ]]
    fillet(verrundung5_edges, radius=VERRUNDUNG5_R)


solid = part.part
